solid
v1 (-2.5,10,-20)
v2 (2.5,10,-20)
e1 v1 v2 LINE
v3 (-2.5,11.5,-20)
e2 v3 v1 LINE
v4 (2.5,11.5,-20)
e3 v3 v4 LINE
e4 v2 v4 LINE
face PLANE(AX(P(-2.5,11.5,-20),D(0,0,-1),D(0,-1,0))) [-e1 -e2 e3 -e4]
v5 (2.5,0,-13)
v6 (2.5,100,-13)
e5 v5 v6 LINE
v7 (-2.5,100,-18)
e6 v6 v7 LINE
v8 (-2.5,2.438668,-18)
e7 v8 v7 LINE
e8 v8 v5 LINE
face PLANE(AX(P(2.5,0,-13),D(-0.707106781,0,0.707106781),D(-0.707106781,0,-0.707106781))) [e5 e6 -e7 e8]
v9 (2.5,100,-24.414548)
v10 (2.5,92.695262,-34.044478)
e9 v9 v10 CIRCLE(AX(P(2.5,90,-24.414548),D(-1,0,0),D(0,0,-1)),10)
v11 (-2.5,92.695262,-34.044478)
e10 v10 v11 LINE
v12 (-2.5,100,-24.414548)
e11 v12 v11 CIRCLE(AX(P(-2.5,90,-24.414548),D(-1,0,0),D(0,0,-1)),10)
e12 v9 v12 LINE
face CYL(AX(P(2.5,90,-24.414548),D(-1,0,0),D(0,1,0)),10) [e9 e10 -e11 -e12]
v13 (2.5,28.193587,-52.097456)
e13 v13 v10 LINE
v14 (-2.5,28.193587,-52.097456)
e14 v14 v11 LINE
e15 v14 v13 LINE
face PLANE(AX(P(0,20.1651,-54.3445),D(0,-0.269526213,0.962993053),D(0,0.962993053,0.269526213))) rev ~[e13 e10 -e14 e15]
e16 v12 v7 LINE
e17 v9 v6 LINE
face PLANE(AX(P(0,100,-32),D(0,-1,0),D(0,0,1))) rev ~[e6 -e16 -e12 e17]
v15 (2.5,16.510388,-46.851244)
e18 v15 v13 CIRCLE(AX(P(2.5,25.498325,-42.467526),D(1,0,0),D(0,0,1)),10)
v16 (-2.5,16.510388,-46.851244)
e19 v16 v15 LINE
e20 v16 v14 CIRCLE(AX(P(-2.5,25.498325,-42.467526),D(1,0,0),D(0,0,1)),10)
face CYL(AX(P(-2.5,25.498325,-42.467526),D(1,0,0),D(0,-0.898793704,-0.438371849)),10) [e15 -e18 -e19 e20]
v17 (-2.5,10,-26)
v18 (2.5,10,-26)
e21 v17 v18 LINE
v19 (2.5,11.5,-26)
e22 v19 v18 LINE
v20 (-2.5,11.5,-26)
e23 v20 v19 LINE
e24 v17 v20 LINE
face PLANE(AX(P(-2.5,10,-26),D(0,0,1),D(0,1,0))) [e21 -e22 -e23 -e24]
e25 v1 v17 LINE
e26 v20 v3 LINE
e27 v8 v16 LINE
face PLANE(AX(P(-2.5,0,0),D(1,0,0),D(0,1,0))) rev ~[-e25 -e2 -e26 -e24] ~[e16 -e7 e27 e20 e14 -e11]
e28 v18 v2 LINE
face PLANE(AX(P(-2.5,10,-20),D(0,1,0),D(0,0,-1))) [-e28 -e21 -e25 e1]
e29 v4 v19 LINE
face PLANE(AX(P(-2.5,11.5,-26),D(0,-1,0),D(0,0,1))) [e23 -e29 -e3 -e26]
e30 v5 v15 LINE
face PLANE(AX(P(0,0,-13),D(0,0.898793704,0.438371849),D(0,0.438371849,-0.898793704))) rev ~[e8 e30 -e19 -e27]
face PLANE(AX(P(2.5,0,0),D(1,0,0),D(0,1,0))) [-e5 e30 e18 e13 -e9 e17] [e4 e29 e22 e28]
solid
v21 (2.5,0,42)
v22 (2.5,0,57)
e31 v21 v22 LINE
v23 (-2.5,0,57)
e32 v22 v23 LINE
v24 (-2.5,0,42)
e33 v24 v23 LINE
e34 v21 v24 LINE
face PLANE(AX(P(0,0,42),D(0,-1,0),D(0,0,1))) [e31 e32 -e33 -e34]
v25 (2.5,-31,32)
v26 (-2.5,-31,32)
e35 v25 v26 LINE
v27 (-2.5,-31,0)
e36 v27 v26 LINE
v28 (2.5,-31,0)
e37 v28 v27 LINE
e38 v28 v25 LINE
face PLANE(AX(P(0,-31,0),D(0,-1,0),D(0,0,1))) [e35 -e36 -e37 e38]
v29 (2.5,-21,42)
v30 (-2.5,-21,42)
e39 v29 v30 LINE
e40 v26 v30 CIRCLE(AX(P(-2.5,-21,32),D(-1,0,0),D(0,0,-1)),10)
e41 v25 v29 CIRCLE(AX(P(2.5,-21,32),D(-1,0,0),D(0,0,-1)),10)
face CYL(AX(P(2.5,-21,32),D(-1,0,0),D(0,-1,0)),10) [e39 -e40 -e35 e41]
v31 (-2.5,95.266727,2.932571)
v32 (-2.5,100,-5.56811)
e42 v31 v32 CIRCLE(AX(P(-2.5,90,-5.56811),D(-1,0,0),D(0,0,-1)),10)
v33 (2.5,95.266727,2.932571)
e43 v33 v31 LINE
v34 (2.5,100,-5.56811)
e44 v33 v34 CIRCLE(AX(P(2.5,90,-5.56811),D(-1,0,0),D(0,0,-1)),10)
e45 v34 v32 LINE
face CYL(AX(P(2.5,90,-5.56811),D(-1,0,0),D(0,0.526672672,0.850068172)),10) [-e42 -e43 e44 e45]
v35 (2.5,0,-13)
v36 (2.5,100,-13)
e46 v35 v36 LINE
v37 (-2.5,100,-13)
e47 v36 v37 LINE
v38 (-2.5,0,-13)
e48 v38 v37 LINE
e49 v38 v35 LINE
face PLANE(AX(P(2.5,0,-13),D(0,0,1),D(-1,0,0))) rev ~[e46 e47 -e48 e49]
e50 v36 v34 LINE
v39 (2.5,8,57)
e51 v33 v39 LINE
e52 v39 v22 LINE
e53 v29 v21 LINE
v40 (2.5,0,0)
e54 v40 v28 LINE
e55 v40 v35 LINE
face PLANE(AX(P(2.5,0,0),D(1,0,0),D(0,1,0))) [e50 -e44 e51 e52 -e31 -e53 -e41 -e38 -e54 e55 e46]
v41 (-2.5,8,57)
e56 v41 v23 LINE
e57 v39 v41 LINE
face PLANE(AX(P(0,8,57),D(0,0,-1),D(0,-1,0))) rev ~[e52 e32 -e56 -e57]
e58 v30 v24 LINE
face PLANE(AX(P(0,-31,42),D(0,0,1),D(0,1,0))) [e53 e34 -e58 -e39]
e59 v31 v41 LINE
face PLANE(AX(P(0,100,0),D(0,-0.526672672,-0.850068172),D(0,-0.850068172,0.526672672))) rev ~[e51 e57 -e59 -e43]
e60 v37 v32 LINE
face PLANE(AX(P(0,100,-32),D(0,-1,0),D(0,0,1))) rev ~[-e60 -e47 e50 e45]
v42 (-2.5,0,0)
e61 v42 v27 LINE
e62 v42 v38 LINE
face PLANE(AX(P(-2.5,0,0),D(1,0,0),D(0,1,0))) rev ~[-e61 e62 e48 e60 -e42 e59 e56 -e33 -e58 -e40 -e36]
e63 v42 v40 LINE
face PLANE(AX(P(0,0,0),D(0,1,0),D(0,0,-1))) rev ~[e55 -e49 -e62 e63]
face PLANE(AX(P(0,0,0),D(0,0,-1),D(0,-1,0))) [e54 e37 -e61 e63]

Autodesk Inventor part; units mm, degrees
ref_plane "YZ Plane" through (0, 0, 0) normal (1, 0, 0) x (0, 1, 0)
ref_plane "XZ Plane" through (0, 0, 0) normal (0, 1, 0) x (-1, 0, 0)
sketch "Sketch1" plane through (0, 0, 0) normal (1, 0, 0) x (0, 1, 0)
  line L0 (0, 0) -> (-31, 0)
  line L1 (-31, 0) -> (-31, 42)
  line L2 (-31, 42) -> (0, 42)
  line L3 (0, 42) -> (0, 57)
  line L4 (0, 0) -> (0, -13)
  line L5 (0, -13) -> (20.1651, -54.3445)
  line L6 (100, -32) -> (100, 0)
  line L7 (100, 0) -> (8, 57)
  line L8 (20.1651, -54.3445) -> (100, -32)
  line L9 (8, 57) -> (0, 57)
  dimension "d0" = 31
  dimension "d1" = 42
  dimension "d2" = 15
  dimension "d3" = 13
  dimension "d4" = 46
  dimension "d5" = 154
  dimension "d6" = 100
  dimension "d8" = 32
  dimension "d14" = 8
extrude "Extrusion1" add sketch "Sketch1" along normal mid plane 5
fillet "Fillet1" radius 10 4 edges at (0, 100, 0) (0, 100, -32) (0, -31, 42) (0, 20.1651, -54.3445)
sketch "Sketch2" plane through (-2.5, 0, -13) normal (0, -1, 0) x (1, 0, 0)
  line L0 (5, 0) -> (0, 0) projected
  line L1 (5, 13) -> (5, 0) projected
  line L2 (0, 13) -> (5, 13) projected
  line L3 (0, 0) -> (0, 13) projected
  line L4 (0, 0) -> (0, -5)
  line L5 (0, -41.3445) -> (0, 0) projected
  line L6 (5, 0) -> (0, -5)
  line L7 (5, 0) -> (0, 0) projected
  line L8 (5, 0) -> (0, 0)
  point P0 (2.5, 13)
extrude "Extrusion2" cut sketch "Sketch2" against normal through all contours L6 L4 L0
ref_plane "Work Plane1" through (-2.5, 0, -13) normal (0, 0, -1) x (-1, 0, 0)
split body "Split1" result two bodies by plane through (-2.5, 0, -13) normal (0, 0, -1) first body at (2, 42.7312, -26.0325)
sketch "Sketch3" plane through (-2.5, 0, 0) normal (-1, 0, 0) x (0, 0, 1)
  line L0 (-26, 11.5) -> (-20, 11.5)
  line L1 (-20, 11.5) -> (-20, 10)
  line L2 (-20, 10) -> (-26, 10)
  line L3 (-26, 10) -> (-26, 11.5)
  line L4 (-13, 100) -> (-13, 0) projected
  point P0 (0, 0)
  dimension "d15" = 6
  dimension "d16" = 1.5
  dimension "d17" = 10
  dimension "d18" = 7
extrude "Extrusion3" cut sketch "Sketch3" against normal through all bodies 2
equation "\"d9\" = Thickness"
equation "\"d12\" = Thickness"
equation "\"Thickness\" = 5"
properties part number "vertical_stablilizer" material "Foam board"
